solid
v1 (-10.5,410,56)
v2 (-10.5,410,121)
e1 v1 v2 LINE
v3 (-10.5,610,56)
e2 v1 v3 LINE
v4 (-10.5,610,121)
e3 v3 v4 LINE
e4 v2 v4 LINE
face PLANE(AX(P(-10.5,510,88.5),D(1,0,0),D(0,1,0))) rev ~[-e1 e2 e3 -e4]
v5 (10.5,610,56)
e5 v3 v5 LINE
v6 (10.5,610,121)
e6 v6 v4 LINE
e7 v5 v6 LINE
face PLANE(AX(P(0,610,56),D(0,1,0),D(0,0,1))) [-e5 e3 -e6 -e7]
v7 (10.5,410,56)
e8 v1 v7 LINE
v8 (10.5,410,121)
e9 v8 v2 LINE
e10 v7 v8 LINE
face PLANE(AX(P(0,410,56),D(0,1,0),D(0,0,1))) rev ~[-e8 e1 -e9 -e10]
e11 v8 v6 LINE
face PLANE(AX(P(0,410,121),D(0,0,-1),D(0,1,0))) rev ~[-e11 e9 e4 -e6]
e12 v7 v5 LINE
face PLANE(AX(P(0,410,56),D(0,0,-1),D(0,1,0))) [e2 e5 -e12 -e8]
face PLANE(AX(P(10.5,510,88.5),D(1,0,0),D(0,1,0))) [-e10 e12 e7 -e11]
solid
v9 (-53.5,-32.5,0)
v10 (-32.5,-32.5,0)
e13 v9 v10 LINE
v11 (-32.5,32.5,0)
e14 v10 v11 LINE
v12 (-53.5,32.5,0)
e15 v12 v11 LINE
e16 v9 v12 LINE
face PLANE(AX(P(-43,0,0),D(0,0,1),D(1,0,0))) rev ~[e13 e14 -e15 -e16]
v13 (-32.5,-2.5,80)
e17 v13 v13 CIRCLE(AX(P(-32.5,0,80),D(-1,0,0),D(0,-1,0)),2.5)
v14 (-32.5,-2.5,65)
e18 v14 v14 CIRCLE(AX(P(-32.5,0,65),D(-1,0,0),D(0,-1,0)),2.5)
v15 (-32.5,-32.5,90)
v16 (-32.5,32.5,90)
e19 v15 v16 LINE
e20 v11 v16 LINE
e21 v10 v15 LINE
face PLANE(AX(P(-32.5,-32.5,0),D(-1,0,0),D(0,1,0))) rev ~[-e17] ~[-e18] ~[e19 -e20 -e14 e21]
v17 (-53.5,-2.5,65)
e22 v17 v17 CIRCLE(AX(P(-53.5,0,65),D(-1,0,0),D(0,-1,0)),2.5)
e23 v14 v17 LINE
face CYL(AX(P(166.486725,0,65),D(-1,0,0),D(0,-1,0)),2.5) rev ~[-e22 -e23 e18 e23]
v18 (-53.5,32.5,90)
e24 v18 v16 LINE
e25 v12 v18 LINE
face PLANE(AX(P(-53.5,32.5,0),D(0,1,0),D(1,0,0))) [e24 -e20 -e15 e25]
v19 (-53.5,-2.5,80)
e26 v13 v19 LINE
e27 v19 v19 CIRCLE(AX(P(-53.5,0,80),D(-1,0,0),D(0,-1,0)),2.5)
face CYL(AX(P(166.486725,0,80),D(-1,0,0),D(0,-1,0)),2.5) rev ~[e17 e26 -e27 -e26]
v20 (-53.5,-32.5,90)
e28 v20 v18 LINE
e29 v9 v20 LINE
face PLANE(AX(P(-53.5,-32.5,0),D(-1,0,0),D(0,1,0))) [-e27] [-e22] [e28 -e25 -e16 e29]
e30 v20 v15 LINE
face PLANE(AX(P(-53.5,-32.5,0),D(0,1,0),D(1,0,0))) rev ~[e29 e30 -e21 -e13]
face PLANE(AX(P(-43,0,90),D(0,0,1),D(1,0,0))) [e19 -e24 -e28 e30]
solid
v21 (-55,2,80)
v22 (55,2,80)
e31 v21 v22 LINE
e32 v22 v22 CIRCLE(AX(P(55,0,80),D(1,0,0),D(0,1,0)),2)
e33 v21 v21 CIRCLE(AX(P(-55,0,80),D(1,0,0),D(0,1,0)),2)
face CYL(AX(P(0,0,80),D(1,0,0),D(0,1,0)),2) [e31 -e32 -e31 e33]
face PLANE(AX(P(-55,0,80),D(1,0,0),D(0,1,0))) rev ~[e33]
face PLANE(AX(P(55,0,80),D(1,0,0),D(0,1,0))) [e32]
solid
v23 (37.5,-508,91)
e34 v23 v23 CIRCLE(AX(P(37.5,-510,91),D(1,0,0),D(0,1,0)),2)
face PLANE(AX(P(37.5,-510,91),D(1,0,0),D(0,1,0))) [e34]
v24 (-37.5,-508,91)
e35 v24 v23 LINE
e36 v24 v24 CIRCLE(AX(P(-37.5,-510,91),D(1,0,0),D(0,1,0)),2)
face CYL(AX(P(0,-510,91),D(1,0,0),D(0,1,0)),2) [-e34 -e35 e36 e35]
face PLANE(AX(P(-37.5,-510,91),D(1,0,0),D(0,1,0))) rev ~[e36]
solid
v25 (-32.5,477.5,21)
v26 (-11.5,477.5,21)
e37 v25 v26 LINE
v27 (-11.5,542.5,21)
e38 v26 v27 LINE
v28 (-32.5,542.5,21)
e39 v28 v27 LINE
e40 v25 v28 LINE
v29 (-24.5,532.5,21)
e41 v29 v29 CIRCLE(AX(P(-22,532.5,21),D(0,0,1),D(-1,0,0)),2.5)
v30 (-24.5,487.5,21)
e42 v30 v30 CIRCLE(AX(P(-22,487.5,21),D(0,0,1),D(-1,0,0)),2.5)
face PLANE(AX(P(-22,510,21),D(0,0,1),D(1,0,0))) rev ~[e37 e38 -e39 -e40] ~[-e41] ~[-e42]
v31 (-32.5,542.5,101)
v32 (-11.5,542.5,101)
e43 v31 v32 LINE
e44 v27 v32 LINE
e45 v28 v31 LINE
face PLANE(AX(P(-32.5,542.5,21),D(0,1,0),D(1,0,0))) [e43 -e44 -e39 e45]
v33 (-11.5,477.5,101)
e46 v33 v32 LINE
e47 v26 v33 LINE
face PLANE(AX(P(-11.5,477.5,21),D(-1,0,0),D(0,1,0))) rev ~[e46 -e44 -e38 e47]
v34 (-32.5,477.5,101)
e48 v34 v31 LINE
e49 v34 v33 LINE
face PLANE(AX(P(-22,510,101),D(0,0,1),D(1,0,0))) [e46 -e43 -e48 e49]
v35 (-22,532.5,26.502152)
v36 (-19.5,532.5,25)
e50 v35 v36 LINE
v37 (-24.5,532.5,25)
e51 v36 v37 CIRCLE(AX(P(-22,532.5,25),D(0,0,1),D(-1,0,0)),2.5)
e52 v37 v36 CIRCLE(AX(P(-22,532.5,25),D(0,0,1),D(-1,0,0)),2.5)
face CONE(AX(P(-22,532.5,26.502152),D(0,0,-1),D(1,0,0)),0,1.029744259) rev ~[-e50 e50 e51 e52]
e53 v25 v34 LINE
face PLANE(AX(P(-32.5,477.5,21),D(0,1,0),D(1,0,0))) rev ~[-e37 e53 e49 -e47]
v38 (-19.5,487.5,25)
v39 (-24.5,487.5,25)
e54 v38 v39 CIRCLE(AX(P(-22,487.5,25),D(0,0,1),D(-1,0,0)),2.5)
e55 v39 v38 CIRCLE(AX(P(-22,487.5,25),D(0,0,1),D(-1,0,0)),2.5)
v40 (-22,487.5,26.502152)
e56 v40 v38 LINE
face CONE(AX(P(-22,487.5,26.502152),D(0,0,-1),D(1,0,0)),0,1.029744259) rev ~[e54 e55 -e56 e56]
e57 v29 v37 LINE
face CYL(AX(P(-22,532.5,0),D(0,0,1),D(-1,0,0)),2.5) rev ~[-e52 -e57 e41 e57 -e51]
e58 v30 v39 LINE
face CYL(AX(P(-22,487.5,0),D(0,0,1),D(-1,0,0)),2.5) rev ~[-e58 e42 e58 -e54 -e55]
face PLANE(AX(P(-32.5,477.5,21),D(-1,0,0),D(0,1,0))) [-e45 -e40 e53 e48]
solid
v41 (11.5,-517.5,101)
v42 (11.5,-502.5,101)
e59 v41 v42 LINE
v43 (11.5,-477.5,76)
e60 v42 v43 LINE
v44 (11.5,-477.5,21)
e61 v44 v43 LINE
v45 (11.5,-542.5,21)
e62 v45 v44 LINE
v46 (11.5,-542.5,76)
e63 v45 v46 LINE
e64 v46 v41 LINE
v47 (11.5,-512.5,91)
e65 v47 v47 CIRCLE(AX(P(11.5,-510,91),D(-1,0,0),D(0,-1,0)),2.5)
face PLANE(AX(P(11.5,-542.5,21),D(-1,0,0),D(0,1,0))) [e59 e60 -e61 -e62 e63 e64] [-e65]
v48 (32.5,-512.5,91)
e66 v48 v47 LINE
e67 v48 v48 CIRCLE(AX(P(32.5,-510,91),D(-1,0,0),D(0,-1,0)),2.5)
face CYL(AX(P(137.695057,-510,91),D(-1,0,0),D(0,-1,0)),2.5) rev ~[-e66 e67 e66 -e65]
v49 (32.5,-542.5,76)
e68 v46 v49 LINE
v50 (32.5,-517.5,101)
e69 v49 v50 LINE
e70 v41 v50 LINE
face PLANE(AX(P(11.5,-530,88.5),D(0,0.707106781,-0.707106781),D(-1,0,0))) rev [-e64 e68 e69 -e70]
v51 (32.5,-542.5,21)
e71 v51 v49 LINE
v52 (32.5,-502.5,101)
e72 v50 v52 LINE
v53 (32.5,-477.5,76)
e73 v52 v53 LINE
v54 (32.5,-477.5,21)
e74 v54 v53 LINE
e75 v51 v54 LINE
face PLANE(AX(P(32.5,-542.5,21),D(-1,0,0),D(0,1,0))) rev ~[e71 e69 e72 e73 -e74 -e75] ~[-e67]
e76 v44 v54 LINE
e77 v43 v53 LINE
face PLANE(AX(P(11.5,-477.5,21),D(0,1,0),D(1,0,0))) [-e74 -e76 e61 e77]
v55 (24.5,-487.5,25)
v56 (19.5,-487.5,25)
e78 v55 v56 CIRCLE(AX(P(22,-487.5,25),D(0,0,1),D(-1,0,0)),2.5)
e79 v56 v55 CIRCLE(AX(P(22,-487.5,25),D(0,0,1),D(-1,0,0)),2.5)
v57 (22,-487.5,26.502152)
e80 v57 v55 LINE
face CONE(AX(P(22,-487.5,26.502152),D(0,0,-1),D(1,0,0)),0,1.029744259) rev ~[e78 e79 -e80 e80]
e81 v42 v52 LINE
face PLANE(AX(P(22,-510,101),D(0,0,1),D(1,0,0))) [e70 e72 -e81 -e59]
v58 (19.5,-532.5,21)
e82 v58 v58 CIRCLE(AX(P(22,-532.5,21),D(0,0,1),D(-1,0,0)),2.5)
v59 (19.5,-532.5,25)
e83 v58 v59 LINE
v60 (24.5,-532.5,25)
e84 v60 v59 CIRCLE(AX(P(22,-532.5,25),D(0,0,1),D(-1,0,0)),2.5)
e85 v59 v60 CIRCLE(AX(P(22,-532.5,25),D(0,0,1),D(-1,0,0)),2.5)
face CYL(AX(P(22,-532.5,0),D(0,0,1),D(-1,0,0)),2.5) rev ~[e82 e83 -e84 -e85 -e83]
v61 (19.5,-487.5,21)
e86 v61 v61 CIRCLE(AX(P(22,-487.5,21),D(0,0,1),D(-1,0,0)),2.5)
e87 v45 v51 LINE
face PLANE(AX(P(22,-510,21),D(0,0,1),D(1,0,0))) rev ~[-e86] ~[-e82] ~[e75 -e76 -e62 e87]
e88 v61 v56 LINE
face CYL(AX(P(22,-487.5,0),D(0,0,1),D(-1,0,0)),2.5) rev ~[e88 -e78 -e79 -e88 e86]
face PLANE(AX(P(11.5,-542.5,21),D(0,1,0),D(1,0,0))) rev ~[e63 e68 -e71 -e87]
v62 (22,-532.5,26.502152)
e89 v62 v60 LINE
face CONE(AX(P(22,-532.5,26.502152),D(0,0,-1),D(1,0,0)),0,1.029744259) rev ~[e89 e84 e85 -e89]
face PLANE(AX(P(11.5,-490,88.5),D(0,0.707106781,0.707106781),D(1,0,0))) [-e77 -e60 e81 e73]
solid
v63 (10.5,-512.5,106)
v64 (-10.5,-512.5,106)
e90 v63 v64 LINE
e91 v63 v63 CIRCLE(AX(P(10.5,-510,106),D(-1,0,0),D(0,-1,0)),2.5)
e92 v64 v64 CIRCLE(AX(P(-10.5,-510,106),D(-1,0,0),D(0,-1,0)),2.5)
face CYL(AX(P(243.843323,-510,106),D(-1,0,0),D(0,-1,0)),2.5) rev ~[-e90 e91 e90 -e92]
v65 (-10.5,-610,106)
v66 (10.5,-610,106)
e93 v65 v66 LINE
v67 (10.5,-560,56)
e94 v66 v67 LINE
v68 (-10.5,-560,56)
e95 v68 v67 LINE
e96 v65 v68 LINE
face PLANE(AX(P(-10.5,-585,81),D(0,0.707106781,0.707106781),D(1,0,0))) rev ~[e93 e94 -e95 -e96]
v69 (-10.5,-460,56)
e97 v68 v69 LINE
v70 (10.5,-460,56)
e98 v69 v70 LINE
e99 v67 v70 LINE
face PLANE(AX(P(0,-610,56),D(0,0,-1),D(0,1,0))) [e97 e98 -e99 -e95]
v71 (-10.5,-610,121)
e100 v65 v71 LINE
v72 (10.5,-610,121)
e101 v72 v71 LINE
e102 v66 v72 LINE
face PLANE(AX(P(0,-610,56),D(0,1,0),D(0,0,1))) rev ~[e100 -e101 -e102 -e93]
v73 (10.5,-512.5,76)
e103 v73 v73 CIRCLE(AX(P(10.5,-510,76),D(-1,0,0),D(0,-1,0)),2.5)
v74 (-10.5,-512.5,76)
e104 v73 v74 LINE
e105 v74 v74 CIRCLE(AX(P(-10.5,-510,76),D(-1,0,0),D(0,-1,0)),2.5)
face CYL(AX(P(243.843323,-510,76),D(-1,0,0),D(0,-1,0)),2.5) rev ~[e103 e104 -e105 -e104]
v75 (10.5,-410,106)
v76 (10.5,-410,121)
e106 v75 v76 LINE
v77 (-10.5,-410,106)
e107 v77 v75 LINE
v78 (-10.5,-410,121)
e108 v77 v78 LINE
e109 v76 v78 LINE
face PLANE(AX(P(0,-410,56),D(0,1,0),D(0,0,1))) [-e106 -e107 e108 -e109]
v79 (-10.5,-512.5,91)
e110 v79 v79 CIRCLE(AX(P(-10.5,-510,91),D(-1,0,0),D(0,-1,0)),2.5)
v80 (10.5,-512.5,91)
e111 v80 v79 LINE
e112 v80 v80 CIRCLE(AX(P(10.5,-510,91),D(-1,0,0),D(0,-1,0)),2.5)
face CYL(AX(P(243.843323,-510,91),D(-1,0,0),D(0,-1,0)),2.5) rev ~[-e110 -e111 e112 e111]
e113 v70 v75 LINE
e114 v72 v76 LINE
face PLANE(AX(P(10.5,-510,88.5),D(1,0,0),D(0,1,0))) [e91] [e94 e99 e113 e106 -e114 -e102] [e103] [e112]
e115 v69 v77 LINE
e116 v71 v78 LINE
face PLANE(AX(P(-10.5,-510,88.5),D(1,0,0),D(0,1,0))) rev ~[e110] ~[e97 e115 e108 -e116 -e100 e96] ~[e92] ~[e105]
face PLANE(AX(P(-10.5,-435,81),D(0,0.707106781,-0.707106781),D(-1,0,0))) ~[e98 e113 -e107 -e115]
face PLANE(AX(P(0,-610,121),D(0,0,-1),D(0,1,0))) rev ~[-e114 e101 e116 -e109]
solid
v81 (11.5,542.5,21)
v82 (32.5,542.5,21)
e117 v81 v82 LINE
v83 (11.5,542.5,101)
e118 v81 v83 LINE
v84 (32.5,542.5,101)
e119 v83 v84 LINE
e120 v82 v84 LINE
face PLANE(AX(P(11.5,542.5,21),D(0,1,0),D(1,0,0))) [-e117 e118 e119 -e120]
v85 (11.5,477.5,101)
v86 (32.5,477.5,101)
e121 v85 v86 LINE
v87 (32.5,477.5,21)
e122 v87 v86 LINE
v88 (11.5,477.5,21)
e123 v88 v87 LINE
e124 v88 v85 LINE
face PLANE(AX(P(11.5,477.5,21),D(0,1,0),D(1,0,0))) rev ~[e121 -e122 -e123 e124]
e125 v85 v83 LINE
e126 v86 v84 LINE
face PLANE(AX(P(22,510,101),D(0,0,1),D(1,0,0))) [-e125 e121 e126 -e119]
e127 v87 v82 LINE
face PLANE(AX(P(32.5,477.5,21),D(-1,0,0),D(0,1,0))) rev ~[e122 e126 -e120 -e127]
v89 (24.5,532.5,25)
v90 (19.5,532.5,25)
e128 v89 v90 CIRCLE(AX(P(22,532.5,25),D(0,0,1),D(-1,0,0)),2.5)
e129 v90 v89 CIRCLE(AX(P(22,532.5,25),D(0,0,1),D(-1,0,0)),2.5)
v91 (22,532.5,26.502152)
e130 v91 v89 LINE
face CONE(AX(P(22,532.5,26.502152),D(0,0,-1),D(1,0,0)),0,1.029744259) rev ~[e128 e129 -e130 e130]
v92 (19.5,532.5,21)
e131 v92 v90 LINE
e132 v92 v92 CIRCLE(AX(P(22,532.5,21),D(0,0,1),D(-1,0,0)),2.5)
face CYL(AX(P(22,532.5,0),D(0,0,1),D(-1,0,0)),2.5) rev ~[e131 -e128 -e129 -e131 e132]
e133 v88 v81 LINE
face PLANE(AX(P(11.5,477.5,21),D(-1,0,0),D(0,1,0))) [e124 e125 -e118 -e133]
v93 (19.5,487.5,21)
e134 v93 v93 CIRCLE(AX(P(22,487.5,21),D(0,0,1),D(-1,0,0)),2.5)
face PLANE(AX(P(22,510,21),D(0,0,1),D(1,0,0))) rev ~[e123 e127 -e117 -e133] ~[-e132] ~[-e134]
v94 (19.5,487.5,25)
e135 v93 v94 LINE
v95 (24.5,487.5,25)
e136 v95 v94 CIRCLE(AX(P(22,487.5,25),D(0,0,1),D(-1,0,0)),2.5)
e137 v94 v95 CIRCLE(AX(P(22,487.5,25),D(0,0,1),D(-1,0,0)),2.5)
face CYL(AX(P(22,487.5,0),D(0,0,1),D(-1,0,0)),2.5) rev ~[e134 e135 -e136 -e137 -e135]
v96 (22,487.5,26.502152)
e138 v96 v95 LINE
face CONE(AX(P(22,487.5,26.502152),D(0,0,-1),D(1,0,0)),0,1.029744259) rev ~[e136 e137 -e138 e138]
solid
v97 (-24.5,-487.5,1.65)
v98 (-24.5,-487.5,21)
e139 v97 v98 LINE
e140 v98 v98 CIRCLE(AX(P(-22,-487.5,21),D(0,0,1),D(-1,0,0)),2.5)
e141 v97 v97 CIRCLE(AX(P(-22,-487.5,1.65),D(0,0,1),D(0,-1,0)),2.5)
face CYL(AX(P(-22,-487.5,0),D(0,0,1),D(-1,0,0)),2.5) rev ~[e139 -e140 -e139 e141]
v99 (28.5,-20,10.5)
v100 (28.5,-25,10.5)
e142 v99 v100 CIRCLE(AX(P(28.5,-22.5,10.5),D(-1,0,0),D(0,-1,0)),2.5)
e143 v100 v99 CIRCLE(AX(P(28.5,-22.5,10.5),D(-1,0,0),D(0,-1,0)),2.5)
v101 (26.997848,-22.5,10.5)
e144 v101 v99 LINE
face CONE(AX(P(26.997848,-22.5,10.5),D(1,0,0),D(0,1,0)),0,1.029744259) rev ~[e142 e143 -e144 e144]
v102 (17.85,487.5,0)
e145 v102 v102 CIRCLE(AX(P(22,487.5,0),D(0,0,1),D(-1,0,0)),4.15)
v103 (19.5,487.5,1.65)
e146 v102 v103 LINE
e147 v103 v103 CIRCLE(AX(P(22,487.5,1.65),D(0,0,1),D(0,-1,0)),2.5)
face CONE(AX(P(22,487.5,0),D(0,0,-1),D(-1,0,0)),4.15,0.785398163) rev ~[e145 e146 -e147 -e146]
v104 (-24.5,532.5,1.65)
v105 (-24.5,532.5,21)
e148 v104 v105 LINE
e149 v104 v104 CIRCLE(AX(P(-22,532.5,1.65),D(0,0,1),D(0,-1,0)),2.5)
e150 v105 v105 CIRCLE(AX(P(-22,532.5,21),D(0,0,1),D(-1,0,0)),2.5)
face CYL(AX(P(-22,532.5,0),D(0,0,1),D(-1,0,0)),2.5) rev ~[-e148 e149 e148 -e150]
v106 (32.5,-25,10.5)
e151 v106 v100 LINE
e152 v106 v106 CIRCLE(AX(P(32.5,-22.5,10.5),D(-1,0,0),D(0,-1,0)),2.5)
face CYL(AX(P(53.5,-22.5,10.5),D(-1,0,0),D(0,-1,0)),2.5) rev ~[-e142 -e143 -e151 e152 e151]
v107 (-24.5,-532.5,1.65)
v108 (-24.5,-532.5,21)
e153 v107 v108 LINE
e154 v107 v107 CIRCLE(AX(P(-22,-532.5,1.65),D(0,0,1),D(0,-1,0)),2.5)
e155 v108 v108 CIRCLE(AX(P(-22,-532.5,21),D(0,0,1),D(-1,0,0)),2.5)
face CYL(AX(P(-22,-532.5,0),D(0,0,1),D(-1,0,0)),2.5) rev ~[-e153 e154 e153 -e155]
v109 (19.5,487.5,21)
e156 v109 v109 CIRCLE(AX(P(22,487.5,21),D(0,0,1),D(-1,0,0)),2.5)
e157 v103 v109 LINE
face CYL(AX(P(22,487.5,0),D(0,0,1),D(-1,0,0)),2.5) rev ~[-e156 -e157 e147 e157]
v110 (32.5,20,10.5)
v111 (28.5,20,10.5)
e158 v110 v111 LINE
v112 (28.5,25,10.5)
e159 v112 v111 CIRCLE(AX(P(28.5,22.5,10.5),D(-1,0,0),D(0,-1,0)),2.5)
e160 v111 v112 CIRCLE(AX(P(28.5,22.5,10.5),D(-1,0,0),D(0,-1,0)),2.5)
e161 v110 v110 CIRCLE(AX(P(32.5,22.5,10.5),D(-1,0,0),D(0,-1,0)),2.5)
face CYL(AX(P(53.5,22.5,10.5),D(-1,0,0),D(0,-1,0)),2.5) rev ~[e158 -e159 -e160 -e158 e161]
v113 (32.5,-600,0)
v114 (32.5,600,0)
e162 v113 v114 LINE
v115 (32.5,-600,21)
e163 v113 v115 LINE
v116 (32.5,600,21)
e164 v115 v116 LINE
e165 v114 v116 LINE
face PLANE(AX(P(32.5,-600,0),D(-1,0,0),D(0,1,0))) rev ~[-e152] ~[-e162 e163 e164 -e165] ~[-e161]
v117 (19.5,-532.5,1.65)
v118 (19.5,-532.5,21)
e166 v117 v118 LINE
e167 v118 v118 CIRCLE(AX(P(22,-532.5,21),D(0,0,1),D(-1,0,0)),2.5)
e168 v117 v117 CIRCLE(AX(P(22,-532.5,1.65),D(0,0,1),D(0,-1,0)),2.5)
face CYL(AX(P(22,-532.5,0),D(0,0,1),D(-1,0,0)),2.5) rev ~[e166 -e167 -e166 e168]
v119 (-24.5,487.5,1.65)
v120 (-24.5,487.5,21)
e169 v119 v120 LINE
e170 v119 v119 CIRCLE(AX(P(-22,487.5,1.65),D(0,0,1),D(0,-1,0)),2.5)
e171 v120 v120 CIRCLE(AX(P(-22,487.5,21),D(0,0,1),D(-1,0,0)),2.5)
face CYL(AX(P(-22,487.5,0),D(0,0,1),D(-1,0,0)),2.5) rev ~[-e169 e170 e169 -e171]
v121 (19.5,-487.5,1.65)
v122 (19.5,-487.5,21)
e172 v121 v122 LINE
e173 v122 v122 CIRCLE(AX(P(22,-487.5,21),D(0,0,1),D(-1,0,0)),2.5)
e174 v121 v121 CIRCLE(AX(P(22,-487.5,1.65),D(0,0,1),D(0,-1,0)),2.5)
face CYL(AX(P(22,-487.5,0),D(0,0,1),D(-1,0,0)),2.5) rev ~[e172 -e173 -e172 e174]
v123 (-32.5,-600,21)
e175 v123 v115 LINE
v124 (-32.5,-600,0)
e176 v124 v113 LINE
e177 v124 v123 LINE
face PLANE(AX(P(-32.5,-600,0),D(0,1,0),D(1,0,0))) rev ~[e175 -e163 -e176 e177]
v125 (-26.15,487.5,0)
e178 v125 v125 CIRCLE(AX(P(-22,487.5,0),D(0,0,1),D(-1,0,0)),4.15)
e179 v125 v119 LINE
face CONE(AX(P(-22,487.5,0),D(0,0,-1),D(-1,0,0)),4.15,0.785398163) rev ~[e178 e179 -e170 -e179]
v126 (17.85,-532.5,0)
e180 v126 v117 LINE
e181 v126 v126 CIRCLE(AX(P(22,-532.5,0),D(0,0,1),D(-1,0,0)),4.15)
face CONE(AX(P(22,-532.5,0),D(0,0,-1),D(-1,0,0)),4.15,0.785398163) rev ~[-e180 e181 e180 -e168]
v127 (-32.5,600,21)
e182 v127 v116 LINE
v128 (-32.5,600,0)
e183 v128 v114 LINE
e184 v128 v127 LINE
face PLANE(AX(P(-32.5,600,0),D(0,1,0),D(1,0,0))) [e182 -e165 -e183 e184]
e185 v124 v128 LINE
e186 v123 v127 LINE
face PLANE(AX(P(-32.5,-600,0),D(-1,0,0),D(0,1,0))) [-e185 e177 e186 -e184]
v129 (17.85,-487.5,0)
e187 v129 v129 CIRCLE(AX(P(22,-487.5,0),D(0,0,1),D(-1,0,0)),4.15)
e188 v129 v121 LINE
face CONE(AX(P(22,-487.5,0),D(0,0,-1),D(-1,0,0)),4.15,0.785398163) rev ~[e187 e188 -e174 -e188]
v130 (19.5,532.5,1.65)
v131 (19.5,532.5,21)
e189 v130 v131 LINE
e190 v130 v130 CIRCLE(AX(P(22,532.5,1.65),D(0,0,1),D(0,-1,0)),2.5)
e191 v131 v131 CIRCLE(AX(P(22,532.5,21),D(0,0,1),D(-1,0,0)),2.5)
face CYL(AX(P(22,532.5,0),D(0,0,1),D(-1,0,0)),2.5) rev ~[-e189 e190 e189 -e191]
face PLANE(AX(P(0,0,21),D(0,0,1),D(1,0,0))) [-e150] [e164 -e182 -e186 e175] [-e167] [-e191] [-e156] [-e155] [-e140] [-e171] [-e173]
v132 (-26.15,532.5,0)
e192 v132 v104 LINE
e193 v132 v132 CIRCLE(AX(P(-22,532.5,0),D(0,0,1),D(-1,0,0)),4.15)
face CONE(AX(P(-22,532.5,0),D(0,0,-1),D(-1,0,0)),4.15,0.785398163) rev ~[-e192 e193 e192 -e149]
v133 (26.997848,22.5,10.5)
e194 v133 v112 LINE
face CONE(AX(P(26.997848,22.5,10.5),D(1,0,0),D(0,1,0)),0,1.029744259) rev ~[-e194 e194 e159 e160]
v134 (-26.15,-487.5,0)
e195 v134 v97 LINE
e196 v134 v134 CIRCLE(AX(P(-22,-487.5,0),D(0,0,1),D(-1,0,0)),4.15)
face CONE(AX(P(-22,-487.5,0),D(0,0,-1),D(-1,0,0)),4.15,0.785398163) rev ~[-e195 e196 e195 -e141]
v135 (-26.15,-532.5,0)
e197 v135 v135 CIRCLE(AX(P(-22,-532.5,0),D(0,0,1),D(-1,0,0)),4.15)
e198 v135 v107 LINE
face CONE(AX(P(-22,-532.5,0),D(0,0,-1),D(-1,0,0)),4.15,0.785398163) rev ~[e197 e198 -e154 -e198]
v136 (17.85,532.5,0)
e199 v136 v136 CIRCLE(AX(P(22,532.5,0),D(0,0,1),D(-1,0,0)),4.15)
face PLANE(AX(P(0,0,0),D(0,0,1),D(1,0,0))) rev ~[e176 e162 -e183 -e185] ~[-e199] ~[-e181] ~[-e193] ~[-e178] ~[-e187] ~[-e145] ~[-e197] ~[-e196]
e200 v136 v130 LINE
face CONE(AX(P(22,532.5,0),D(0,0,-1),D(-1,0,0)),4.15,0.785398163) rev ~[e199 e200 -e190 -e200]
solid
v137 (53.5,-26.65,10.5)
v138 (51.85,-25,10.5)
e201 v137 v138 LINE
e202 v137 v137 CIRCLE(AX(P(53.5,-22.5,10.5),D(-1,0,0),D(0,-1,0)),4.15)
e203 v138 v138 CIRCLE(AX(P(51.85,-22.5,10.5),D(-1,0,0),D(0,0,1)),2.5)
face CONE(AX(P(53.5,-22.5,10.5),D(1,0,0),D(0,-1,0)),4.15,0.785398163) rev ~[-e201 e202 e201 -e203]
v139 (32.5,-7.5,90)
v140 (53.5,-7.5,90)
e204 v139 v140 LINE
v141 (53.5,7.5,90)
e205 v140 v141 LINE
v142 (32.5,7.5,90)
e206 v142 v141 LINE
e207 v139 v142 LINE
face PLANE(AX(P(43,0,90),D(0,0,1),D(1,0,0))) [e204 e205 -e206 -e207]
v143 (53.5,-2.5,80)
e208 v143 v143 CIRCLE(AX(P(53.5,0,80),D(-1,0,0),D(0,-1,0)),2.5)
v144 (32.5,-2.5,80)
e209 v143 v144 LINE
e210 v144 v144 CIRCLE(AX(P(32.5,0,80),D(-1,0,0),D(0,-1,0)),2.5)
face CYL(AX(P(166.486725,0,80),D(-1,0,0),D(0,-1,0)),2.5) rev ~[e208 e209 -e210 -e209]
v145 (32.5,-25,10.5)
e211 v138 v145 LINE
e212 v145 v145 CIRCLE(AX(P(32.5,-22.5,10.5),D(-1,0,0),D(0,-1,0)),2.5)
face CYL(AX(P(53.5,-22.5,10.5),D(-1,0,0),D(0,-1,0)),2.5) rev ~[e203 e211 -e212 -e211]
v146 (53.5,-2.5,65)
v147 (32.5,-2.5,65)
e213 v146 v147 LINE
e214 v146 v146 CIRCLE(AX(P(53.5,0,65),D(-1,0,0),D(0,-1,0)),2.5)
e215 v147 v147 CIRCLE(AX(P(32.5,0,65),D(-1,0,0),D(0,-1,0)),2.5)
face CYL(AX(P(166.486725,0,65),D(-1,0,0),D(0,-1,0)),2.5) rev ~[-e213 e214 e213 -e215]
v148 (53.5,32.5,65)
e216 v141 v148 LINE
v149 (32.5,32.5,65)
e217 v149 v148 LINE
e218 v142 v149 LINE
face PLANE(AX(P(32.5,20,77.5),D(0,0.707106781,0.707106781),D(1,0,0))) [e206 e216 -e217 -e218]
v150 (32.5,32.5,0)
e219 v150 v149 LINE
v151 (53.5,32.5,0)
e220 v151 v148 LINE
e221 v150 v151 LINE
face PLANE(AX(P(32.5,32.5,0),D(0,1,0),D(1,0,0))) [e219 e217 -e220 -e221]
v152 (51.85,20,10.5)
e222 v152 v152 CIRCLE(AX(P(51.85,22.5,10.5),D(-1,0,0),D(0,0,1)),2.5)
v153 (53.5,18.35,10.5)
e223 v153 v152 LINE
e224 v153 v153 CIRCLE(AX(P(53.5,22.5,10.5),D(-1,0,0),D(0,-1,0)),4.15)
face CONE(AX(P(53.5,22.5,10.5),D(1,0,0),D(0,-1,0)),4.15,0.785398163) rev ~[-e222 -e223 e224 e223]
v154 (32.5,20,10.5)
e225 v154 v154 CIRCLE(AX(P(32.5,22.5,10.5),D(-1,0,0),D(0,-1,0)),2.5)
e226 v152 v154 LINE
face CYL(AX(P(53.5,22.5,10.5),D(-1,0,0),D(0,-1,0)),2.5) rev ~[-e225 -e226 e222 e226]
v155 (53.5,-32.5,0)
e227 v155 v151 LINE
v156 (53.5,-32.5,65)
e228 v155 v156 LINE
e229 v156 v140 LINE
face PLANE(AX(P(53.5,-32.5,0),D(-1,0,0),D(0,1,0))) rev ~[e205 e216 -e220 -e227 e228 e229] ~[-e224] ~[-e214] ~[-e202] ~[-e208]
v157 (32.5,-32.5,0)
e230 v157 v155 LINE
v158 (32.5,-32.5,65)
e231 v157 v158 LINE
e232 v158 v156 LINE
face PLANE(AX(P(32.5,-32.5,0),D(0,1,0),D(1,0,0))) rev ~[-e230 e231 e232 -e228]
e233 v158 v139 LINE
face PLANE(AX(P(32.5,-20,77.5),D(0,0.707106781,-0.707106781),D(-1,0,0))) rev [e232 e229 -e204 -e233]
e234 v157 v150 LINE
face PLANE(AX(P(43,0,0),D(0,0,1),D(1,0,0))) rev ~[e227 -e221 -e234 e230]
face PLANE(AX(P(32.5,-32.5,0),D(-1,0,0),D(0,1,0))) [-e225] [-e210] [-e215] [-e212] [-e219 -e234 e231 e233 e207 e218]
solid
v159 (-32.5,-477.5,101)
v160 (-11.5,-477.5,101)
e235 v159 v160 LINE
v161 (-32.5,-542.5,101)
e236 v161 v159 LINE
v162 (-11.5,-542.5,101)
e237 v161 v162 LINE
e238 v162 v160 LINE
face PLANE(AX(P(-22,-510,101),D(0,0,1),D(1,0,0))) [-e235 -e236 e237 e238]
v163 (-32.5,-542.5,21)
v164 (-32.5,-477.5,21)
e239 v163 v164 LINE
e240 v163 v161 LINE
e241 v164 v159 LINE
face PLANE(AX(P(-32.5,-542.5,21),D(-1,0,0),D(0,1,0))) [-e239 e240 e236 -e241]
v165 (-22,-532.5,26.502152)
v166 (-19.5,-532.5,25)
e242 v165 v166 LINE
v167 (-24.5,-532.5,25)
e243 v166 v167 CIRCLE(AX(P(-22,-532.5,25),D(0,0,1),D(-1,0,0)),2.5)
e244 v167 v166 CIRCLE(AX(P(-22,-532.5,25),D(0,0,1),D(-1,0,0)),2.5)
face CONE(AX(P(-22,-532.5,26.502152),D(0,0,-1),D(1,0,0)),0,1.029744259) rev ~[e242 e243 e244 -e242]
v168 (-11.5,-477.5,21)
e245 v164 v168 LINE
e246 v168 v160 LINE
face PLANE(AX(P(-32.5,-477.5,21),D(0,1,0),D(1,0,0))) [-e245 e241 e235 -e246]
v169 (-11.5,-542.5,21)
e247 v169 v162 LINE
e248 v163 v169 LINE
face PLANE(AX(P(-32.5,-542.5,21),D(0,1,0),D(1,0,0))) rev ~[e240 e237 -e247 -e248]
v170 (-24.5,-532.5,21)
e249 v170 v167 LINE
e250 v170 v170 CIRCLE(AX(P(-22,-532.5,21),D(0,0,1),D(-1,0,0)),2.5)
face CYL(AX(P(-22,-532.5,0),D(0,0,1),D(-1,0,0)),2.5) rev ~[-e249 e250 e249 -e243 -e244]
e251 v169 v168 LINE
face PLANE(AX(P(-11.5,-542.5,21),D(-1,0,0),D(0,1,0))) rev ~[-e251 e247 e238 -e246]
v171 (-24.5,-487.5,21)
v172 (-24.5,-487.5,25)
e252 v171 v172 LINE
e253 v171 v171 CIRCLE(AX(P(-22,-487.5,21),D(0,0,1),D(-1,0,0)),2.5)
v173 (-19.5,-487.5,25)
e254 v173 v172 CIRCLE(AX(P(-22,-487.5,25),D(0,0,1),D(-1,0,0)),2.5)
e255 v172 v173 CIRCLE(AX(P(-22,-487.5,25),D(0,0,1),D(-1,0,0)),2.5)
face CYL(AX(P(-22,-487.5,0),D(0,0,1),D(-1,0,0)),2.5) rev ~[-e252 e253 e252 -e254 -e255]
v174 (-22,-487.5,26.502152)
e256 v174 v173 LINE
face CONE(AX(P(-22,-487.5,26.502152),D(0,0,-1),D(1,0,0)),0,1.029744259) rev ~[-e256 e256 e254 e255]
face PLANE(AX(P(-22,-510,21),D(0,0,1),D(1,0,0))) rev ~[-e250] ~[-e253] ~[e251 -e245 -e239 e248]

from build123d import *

# Parameters (mm, degrees)
F0_W              = 65
F0_H              = 1200
F1_DEPTH          = 21
F2_W              = 21
F2_H              = 65
F3_DEPTH          = 80
F4_W              = 200
F4_H              = 65
F5_DEPTH          = 10.5
F7_D              = 5
F8_D              = 5
F9_W              = 21
F9_H              = 65
F10_DEPTH         = 90
F12_D             = 5
F12_2_D           = 5
F13_SIZE          = 25
F13_2_SIZE        = 25
F15_D             = 5
F15_DEPTH         = 25
F15_CSINK_D       = 8.3
F15_CSINK_ANGLE   = 90
F15_TIP           = 1.5021515476
F15_2_D           = 5
F15_2_DEPTH       = 25
F15_2_CSINK_D     = 8.3
F15_2_CSINK_ANGLE = 90
F15_2_TIP         = 1.5021515476
F15_3_D           = 5
F15_3_DEPTH       = 25
F15_3_CSINK_D     = 8.3
F15_3_CSINK_ANGLE = 90
F15_3_TIP         = 1.5021515476
F15_4_D           = 5
F15_4_DEPTH       = 25
F15_4_CSINK_D     = 8.3
F15_4_CSINK_ANGLE = 90
F15_4_TIP         = 1.5021515476
F15_5_D           = 5
F15_5_DEPTH       = 25
F15_5_CSINK_D     = 8.3
F15_5_CSINK_ANGLE = 90
F15_5_TIP         = 1.5021515476
F17_D             = 5
F17_DEPTH         = 25
F17_CSINK_D       = 8.3
F17_CSINK_ANGLE   = 90
F17_TIP           = 1.5021515476
F17_2_D           = 5
F17_2_DEPTH       = 25
F17_2_CSINK_D     = 8.3
F17_2_CSINK_ANGLE = 90
F17_2_TIP         = 1.5021515476
F18_R             = 2
F19_DEPTH         = 55
F20_R             = 2
F21_DEPTH         = 37.5
F22_SIZE          = 50


# Not quite as in the source:
# - a feature names something its author has since deleted; it is built from what else it names


with BuildPart() as f1:
    # F0 (on Top) → F1 (new body)
    with BuildSketch(Plane.XY):
        Rectangle(F0_W, F0_H)
    extrude(amount=F1_DEPTH)

    # F15
    with Locations(Plane(origin=(0, 0, 0), x_dir=(1, 0, 0), z_dir=(0, 0, -1))):
        with Locations((22, -487.5), (22, -532.5), (-22, -487.5), (-22, -532.5), (22, 532.5), (22, 487.5), (-22, 532.5), (-22, 487.5)):
            CounterSinkHole(F15_D / 2, F15_CSINK_D / 2, depth=F15_DEPTH, counter_sink_angle=F15_CSINK_ANGLE)
            with Locations((0, 0, -(F15_DEPTH + F15_TIP / 2))):  # 118° drill point
                Cone(0, F15_D / 2, F15_TIP, mode=Mode.SUBTRACT)

    # F17
    with Locations(Plane.YZ.offset(53.5)):
        with Locations((-22.5, 10.5), (22.5, 10.5)):
            CounterSinkHole(F17_D / 2, F17_CSINK_D / 2, depth=F17_DEPTH, counter_sink_angle=F17_CSINK_ANGLE)
            with Locations((0, 0, -(F17_DEPTH + F17_TIP / 2))):  # 118° drill point
                Cone(0, F17_D / 2, F17_TIP, mode=Mode.SUBTRACT)


with BuildPart() as f3:
    # F2 (on face) → F3 (new body)
    with BuildSketch(Plane.XY.offset(21)):
        with Locations((-22, 510)):
            Rectangle(F2_W, F2_H)
    extrude(amount=F3_DEPTH)

    # F15#2
    with Locations(Plane(origin=(0, 0, 0), x_dir=(1, 0, 0), z_dir=(0, 0, -1))):
        with Locations((22, -487.5), (22, -532.5), (-22, -487.5), (-22, -532.5), (22, 532.5), (22, 487.5), (-22, 532.5), (-22, 487.5)):
            CounterSinkHole(F15_2_D / 2, F15_2_CSINK_D / 2, depth=F15_2_DEPTH, counter_sink_angle=F15_2_CSINK_ANGLE)
            with Locations((0, 0, -(F15_2_DEPTH + F15_2_TIP / 2))):  # 118° drill point
                Cone(0, F15_2_D / 2, F15_2_TIP, mode=Mode.SUBTRACT)


with BuildPart() as f3b:
    # F2 (on face) → F3, piece 2 (new body)
    with BuildSketch(Plane.XY.offset(21)):
        with Locations((-22, -510)):
            Rectangle(F2_W, F2_H)
    extrude(amount=F3_DEPTH)

    # F15#3
    with Locations(Plane(origin=(0, 0, 0), x_dir=(1, 0, 0), z_dir=(0, 0, -1))):
        with Locations((22, -487.5), (22, -532.5), (-22, -487.5), (-22, -532.5), (22, 532.5), (22, 487.5), (-22, 532.5), (-22, 487.5)):
            CounterSinkHole(F15_3_D / 2, F15_3_CSINK_D / 2, depth=F15_3_DEPTH, counter_sink_angle=F15_3_CSINK_ANGLE)
            with Locations((0, 0, -(F15_3_DEPTH + F15_3_TIP / 2))):  # 118° drill point
                Cone(0, F15_3_D / 2, F15_3_TIP, mode=Mode.SUBTRACT)


with BuildPart() as f3c:
    # F2 (on face) → F3, piece 3 (new body)
    with BuildSketch(Plane.XY.offset(21)):
        with Locations((22, 510)):
            Rectangle(F2_W, F2_H)
    extrude(amount=F3_DEPTH)

    # F15#4
    with Locations(Plane(origin=(0, 0, 0), x_dir=(1, 0, 0), z_dir=(0, 0, -1))):
        with Locations((22, -487.5), (22, -532.5), (-22, -487.5), (-22, -532.5), (22, 532.5), (22, 487.5), (-22, 532.5), (-22, 487.5)):
            CounterSinkHole(F15_4_D / 2, F15_4_CSINK_D / 2, depth=F15_4_DEPTH, counter_sink_angle=F15_4_CSINK_ANGLE)
            with Locations((0, 0, -(F15_4_DEPTH + F15_4_TIP / 2))):  # 118° drill point
                Cone(0, F15_4_D / 2, F15_4_TIP, mode=Mode.SUBTRACT)


with BuildPart() as f3d:
    # F2 (on face) → F3, piece 4 (new body)
    with BuildSketch(Plane.XY.offset(21)):
        with Locations((22, -510)):
            Rectangle(F2_W, F2_H)
    extrude(amount=F3_DEPTH)

    # F7 (through all)
    with Locations(Plane.YZ.offset(32.5)):
        with Locations((-510, 91)):
            Hole(F7_D / 2)

    # F13
    f13_edges = [f3d.edges().sort_by_distance(p)[0] for p in [
        (22, -542.5, 101),
        (22, -477.5, 101),
    ]]
    chamfer(f13_edges, length=F13_SIZE)

    # F15#5
    with Locations(Plane(origin=(0, 0, 0), x_dir=(1, 0, 0), z_dir=(0, 0, -1))):
        with Locations((22, -487.5), (22, -532.5), (-22, -487.5), (-22, -532.5), (22, 532.5), (22, 487.5), (-22, 532.5), (-22, 487.5)):
            CounterSinkHole(F15_5_D / 2, F15_5_CSINK_D / 2, depth=F15_5_DEPTH, counter_sink_angle=F15_5_CSINK_ANGLE)
            with Locations((0, 0, -(F15_5_DEPTH + F15_5_TIP / 2))):  # 118° drill point
                Cone(0, F15_5_D / 2, F15_5_TIP, mode=Mode.SUBTRACT)


with BuildPart() as f5:
    # F4 (on Right) → F5 (new body, symmetric)
    with BuildSketch(Plane.YZ):
        with Locations((-510, 88.5)):
            Rectangle(F4_W, F4_H)
    extrude(amount=F5_DEPTH, both=True)

    # F8 (through all)
    with Locations(Plane.YZ.offset(32.5)):
        with Locations((-510, 76), (-510, 91), (-510, 106)):
            Hole(F8_D / 2)

    # F22
    f22_edges = [f5.edges().sort_by_distance(p)[0] for p in [
        (0, -610, 56),
        (0, -410, 56),
    ]]
    chamfer(f22_edges, length=F22_SIZE)


with BuildPart() as f5b:
    # F4 (on Right) → F5, piece 2 (new body, symmetric)
    with BuildSketch(Plane.YZ):
        with Locations((510, 88.5)):
            Rectangle(F4_W, F4_H)
    extrude(amount=F5_DEPTH, both=True)


with BuildPart() as f10:
    # F9 (on Top) → F10 (new body)
    with BuildSketch(Plane.XY):
        with Locations((-43, 0)):
            Rectangle(F9_W, F9_H)
    extrude(amount=F10_DEPTH)

    # F12 (through all)
    with Locations(Plane.YZ.offset(53.5)):
        with Locations((0, 80), (0, 65)):
            Hole(F12_D / 2)


with BuildPart() as f10b:
    # F9 (on Top) → F10, piece 2 (new body)
    with BuildSketch(Plane.XY):
        with Locations((43, 0)):
            Rectangle(F9_W, F9_H)
    extrude(amount=F10_DEPTH)

    # F12#2 (through all)
    with Locations(Plane.YZ.offset(53.5)):
        with Locations((0, 80), (0, 65)):
            Hole(F12_2_D / 2)

    # F13#2
    f13_2_edges = [f10b.edges().sort_by_distance(p)[0] for p in [
        (43, -32.5, 90),
        (43, 32.5, 90),
    ]]
    chamfer(f13_2_edges, length=F13_2_SIZE)

    # F17#2
    with Locations(Plane.YZ.offset(53.5)):
        with Locations((-22.5, 10.5), (22.5, 10.5)):
            CounterSinkHole(F17_2_D / 2, F17_2_CSINK_D / 2, depth=F17_2_DEPTH, counter_sink_angle=F17_2_CSINK_ANGLE)
            with Locations((0, 0, -(F17_2_DEPTH + F17_2_TIP / 2))):  # 118° drill point
                Cone(0, F17_2_D / 2, F17_2_TIP, mode=Mode.SUBTRACT)


with BuildPart() as f19:
    # F18 (on Right) → F19 (new body, symmetric)
    with BuildSketch(Plane.YZ):
        with Locations((0, 80)):
            Circle(F18_R)
    extrude(amount=F19_DEPTH, both=True)


with BuildPart() as f21:
    # F20 (on Right) → F21 (new body, symmetric)
    with BuildSketch(Plane.YZ):
        with Locations((-510, 91)):
            Circle(F20_R)
    extrude(amount=F21_DEPTH, both=True)


solid = Compound([f1.part, f3.part, f3b.part, f3c.part, f3d.part, f5.part, f5b.part, f10.part, f10b.part, f19.part, f21.part])
